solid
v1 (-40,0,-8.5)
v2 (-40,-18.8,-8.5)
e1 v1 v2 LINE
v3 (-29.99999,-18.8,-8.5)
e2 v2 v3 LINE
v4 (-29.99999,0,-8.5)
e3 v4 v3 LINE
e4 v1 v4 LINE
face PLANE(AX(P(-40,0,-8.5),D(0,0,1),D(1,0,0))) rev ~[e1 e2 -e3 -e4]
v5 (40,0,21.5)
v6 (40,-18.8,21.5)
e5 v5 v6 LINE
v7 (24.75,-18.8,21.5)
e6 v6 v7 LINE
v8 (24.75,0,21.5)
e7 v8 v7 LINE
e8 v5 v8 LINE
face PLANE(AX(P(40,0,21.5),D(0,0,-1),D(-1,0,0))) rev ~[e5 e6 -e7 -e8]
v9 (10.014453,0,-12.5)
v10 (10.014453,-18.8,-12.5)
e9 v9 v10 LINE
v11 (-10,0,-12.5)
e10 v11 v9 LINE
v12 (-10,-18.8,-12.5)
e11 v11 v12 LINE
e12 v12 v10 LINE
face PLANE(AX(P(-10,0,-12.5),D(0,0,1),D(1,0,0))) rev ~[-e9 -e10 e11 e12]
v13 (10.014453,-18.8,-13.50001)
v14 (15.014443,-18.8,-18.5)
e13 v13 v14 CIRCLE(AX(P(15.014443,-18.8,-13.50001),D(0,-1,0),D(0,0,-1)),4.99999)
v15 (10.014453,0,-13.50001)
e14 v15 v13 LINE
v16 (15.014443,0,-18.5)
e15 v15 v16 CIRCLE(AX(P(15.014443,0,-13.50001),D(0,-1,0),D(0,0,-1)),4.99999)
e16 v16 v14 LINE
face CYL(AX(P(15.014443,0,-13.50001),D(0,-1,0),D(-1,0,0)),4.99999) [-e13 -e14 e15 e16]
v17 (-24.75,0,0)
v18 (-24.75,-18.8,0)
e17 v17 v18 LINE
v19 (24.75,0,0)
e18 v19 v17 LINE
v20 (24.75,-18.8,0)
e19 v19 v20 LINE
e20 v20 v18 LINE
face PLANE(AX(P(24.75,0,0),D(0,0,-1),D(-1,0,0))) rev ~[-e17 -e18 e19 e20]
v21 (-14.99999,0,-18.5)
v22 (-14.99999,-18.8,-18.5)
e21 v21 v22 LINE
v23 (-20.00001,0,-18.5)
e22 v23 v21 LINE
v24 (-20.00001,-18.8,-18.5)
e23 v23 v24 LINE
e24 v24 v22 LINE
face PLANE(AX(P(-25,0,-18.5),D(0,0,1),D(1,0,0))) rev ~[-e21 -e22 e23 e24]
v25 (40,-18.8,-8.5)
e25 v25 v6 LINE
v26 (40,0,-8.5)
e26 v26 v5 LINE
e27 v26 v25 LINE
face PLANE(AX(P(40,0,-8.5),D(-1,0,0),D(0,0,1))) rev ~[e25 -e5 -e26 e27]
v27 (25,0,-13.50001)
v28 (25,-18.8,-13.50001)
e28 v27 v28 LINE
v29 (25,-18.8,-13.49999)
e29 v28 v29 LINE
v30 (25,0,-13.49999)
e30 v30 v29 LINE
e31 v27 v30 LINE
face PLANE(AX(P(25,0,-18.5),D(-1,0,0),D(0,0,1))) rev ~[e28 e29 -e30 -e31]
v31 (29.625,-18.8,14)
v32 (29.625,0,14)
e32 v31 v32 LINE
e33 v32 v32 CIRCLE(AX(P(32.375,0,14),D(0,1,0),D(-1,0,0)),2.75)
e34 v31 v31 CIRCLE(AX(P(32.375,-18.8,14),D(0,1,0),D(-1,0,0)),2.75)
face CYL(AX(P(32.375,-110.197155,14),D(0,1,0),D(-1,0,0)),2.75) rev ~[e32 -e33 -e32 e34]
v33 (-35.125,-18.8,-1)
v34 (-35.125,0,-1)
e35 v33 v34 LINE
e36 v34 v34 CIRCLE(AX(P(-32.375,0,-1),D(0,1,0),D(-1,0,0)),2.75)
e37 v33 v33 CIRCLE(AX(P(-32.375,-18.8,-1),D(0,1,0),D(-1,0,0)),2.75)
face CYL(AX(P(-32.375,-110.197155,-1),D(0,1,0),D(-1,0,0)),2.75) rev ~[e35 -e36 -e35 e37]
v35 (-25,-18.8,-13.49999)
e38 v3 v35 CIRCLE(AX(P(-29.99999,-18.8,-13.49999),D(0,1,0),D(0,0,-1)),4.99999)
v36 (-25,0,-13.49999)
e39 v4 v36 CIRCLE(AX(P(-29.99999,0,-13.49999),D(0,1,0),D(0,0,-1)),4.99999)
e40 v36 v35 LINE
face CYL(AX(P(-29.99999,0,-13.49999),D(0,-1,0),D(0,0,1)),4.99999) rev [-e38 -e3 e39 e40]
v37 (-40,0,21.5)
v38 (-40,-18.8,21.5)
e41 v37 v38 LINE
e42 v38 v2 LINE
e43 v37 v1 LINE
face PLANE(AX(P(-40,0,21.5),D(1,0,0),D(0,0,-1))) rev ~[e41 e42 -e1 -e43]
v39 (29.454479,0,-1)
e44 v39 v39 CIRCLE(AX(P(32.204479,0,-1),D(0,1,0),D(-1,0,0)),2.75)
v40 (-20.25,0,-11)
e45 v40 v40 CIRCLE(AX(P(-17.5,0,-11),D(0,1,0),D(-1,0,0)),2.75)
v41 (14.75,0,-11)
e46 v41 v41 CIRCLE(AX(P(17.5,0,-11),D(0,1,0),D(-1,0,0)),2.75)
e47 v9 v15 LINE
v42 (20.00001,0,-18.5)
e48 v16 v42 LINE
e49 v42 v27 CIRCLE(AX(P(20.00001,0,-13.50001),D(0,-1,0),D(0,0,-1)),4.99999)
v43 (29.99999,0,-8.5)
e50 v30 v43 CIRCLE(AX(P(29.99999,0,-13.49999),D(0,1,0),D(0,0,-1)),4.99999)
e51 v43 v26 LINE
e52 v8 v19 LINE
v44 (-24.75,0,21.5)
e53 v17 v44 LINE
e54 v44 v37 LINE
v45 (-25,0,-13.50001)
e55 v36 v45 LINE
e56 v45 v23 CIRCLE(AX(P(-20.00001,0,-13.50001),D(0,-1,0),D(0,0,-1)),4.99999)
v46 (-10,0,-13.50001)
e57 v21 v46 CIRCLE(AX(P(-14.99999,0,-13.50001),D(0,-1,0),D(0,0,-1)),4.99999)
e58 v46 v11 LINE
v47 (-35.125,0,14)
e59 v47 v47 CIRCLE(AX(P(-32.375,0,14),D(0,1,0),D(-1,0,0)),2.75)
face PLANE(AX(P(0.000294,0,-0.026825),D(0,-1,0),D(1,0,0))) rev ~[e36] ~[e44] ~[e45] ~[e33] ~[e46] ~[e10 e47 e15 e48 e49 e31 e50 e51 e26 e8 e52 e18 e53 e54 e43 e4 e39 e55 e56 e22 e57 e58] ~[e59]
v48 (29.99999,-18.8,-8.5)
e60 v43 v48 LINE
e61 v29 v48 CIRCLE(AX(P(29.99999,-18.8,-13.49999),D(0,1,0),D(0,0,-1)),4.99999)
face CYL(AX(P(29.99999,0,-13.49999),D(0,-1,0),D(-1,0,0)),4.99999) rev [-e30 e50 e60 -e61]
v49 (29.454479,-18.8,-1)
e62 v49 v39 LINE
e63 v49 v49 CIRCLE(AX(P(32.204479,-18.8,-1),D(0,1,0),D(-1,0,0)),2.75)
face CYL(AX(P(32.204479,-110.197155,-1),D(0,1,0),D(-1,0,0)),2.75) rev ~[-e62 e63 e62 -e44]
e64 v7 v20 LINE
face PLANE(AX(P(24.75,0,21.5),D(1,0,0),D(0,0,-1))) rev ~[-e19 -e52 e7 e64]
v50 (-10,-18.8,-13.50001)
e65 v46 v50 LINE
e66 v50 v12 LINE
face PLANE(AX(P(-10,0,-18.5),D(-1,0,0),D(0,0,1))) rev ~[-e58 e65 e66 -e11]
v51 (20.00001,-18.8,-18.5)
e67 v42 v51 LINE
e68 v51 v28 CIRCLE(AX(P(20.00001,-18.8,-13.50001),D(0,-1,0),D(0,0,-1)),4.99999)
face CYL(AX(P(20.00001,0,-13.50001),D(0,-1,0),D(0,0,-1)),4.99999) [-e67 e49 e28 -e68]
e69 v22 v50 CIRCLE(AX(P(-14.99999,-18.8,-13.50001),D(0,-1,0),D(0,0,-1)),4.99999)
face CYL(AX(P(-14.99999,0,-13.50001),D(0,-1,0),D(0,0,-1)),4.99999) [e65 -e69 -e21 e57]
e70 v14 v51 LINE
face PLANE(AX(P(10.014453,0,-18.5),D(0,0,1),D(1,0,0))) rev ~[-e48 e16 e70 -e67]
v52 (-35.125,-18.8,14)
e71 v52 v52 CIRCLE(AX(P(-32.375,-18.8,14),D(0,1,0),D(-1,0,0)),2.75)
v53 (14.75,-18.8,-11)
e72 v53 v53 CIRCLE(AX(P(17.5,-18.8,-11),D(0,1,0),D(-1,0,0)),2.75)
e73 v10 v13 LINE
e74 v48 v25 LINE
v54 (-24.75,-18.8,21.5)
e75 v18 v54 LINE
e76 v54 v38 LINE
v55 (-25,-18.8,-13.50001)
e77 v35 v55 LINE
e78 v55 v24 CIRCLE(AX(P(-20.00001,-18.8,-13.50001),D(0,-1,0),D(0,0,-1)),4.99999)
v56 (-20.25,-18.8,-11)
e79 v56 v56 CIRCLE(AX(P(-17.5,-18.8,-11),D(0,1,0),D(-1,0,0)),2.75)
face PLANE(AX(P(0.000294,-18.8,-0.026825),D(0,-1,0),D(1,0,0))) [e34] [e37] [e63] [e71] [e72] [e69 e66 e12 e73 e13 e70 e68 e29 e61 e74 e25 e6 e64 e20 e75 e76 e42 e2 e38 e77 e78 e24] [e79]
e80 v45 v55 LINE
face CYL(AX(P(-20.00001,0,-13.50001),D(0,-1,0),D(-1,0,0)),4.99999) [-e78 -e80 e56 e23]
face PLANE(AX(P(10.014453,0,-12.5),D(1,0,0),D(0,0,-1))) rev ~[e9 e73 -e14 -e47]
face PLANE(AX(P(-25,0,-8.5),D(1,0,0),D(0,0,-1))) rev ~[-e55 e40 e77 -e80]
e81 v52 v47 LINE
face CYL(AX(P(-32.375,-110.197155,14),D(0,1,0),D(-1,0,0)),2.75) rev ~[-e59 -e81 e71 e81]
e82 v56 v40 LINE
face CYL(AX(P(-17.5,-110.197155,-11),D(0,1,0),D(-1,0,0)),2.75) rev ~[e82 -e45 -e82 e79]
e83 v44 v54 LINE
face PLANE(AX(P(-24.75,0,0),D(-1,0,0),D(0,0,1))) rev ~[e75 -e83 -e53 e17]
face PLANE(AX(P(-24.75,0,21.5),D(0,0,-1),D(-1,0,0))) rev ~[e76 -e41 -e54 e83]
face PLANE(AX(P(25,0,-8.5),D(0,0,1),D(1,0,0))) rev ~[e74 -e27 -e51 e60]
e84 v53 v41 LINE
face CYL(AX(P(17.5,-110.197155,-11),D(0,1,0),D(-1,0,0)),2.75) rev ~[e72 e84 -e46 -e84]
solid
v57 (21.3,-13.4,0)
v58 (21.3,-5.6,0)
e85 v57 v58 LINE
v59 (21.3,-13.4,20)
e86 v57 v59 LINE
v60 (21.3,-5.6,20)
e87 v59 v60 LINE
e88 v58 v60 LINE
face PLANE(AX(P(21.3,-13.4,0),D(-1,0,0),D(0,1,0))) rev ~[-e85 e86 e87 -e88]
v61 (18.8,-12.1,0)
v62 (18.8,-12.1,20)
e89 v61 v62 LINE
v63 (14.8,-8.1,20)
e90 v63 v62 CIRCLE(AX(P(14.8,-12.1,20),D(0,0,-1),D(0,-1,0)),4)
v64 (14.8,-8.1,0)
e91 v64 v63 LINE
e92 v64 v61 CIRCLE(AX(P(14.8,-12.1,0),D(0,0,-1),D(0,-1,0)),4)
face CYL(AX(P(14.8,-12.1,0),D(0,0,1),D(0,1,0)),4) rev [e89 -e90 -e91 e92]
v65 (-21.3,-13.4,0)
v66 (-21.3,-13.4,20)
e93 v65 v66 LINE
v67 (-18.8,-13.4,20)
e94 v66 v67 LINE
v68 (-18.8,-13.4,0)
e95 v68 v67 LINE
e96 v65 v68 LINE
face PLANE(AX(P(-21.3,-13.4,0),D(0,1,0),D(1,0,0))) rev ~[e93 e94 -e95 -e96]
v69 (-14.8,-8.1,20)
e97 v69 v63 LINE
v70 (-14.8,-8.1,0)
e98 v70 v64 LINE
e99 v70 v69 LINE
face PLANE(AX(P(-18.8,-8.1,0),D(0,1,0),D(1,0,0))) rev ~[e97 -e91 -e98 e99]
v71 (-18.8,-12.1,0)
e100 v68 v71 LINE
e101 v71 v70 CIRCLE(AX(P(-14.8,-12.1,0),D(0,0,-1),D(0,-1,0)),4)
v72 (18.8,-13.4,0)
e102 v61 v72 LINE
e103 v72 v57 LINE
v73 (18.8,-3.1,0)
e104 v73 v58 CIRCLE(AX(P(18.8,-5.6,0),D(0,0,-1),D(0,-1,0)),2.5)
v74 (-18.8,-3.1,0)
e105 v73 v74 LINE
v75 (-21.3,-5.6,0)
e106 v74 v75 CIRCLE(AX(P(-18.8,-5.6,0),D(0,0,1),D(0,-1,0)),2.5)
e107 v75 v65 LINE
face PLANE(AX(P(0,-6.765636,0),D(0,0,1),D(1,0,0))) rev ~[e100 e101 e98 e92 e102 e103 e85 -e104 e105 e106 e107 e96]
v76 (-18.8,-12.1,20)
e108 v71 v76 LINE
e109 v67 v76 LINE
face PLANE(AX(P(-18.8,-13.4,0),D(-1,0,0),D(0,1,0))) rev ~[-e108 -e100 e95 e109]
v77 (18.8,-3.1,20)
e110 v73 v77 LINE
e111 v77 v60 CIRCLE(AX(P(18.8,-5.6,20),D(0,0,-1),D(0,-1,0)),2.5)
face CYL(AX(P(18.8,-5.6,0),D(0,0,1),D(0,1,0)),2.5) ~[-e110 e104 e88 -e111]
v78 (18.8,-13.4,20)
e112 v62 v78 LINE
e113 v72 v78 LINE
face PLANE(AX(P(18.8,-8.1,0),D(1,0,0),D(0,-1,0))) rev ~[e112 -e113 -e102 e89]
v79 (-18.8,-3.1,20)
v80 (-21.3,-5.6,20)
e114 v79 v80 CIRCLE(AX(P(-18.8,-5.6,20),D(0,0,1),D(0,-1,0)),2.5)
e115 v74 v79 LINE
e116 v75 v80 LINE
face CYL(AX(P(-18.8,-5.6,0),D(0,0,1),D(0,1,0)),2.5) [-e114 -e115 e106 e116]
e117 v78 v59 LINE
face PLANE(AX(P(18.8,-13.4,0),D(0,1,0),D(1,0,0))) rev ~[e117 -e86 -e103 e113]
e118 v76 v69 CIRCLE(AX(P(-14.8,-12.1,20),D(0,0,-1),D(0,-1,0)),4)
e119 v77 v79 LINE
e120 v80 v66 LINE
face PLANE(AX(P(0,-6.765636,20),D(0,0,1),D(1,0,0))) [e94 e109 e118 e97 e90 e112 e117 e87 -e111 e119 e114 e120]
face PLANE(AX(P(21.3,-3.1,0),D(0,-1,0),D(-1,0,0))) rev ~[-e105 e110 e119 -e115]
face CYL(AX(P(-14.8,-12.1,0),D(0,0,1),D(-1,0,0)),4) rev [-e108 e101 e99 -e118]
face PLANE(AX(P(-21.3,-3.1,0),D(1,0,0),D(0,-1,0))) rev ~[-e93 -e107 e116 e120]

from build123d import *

# Parameters (mm, degrees)
F1_DEPTH = 18.8
F3_DEPTH = 20
F4_R     = 4
F5_R     = 2.5
F6_R     = 2.5
F8_R     = 4.99999
F12_D    = 5.5


# Not quite as in the source:
# - two fillets or chamfers of one size are made in one step
# - a fillet or chamfer is up to 0.001 mm smaller than in the source, because OpenCascade refuses the exact size


with BuildPart() as f1:
    # F0 (on Front) → F1 (new body)
    with BuildSketch(Plane.XZ):
        Polygon((-24.75, 21.5), (-40, 21.5), (-40, -8.5), (-25, -8.5), (-25, -18.5), (-10, -18.5), (-10, -12.5), (10.0144529715, -12.5), (10.0144529715, -18.5), (25, -18.5), (25, -8.5), (40, -8.5), (40, 21.5), (24.75, 21.5), (24.75, 0), (-24.75, 0), align=None)
    extrude(amount=F1_DEPTH)

    # F8 (radius 5 in the source; OpenCascade refuses exactly that, so slightly less here)
    f8_edges = [f1.edges().sort_by_distance(p)[0] for p in [
        (-25, -9.4, -18.5),
        (25, -9.4, -18.5),
        (-25, -9.4, -8.5),
        (-10, -9.4, -18.5),
        (10.014453, -9.4, -18.5),
        (25, -9.4, -8.5),
    ]]
    fillet(f8_edges, radius=F8_R)

    # F12 (through all)
    with Locations(Plane.XZ.offset(18.8)):
        with Locations((-32.375, 14), (-32.375, -1), (-17.5, -11), (17.5, -11), (32.2044789791, -1), (32.375, 14)):
            Hole(F12_D / 2)


with BuildPart() as f3:
    # F2 (on face) → F3 (new body)
    with BuildSketch(Plane.XY):
        Polygon((21.3, -3.1), (-21.3, -3.1), (-21.3, -13.4), (-18.8, -13.4), (-18.8, -8.1), (18.8, -8.1), (18.8, -13.4), (21.3, -13.4), align=None)
    extrude(amount=F3_DEPTH)

    # F4
    f4_edges = [f3.edges().sort_by_distance(p)[0] for p in [
        (-18.8, -8.1, 10),
        (18.8, -8.1, 10),
    ]]
    fillet(f4_edges, radius=F4_R)

    # F5
    f5_edges = [f3.edges().sort_by_distance(p)[0] for p in [
        (21.3, -3.1, 10),
    ]]
    fillet(f5_edges, radius=F5_R)

    # F6
    f6_edges = [f3.edges().sort_by_distance(p)[0] for p in [
        (-21.3, -3.1, 10),
    ]]
    fillet(f6_edges, radius=F6_R)


solid = Compound([f1.part, f3.part])
